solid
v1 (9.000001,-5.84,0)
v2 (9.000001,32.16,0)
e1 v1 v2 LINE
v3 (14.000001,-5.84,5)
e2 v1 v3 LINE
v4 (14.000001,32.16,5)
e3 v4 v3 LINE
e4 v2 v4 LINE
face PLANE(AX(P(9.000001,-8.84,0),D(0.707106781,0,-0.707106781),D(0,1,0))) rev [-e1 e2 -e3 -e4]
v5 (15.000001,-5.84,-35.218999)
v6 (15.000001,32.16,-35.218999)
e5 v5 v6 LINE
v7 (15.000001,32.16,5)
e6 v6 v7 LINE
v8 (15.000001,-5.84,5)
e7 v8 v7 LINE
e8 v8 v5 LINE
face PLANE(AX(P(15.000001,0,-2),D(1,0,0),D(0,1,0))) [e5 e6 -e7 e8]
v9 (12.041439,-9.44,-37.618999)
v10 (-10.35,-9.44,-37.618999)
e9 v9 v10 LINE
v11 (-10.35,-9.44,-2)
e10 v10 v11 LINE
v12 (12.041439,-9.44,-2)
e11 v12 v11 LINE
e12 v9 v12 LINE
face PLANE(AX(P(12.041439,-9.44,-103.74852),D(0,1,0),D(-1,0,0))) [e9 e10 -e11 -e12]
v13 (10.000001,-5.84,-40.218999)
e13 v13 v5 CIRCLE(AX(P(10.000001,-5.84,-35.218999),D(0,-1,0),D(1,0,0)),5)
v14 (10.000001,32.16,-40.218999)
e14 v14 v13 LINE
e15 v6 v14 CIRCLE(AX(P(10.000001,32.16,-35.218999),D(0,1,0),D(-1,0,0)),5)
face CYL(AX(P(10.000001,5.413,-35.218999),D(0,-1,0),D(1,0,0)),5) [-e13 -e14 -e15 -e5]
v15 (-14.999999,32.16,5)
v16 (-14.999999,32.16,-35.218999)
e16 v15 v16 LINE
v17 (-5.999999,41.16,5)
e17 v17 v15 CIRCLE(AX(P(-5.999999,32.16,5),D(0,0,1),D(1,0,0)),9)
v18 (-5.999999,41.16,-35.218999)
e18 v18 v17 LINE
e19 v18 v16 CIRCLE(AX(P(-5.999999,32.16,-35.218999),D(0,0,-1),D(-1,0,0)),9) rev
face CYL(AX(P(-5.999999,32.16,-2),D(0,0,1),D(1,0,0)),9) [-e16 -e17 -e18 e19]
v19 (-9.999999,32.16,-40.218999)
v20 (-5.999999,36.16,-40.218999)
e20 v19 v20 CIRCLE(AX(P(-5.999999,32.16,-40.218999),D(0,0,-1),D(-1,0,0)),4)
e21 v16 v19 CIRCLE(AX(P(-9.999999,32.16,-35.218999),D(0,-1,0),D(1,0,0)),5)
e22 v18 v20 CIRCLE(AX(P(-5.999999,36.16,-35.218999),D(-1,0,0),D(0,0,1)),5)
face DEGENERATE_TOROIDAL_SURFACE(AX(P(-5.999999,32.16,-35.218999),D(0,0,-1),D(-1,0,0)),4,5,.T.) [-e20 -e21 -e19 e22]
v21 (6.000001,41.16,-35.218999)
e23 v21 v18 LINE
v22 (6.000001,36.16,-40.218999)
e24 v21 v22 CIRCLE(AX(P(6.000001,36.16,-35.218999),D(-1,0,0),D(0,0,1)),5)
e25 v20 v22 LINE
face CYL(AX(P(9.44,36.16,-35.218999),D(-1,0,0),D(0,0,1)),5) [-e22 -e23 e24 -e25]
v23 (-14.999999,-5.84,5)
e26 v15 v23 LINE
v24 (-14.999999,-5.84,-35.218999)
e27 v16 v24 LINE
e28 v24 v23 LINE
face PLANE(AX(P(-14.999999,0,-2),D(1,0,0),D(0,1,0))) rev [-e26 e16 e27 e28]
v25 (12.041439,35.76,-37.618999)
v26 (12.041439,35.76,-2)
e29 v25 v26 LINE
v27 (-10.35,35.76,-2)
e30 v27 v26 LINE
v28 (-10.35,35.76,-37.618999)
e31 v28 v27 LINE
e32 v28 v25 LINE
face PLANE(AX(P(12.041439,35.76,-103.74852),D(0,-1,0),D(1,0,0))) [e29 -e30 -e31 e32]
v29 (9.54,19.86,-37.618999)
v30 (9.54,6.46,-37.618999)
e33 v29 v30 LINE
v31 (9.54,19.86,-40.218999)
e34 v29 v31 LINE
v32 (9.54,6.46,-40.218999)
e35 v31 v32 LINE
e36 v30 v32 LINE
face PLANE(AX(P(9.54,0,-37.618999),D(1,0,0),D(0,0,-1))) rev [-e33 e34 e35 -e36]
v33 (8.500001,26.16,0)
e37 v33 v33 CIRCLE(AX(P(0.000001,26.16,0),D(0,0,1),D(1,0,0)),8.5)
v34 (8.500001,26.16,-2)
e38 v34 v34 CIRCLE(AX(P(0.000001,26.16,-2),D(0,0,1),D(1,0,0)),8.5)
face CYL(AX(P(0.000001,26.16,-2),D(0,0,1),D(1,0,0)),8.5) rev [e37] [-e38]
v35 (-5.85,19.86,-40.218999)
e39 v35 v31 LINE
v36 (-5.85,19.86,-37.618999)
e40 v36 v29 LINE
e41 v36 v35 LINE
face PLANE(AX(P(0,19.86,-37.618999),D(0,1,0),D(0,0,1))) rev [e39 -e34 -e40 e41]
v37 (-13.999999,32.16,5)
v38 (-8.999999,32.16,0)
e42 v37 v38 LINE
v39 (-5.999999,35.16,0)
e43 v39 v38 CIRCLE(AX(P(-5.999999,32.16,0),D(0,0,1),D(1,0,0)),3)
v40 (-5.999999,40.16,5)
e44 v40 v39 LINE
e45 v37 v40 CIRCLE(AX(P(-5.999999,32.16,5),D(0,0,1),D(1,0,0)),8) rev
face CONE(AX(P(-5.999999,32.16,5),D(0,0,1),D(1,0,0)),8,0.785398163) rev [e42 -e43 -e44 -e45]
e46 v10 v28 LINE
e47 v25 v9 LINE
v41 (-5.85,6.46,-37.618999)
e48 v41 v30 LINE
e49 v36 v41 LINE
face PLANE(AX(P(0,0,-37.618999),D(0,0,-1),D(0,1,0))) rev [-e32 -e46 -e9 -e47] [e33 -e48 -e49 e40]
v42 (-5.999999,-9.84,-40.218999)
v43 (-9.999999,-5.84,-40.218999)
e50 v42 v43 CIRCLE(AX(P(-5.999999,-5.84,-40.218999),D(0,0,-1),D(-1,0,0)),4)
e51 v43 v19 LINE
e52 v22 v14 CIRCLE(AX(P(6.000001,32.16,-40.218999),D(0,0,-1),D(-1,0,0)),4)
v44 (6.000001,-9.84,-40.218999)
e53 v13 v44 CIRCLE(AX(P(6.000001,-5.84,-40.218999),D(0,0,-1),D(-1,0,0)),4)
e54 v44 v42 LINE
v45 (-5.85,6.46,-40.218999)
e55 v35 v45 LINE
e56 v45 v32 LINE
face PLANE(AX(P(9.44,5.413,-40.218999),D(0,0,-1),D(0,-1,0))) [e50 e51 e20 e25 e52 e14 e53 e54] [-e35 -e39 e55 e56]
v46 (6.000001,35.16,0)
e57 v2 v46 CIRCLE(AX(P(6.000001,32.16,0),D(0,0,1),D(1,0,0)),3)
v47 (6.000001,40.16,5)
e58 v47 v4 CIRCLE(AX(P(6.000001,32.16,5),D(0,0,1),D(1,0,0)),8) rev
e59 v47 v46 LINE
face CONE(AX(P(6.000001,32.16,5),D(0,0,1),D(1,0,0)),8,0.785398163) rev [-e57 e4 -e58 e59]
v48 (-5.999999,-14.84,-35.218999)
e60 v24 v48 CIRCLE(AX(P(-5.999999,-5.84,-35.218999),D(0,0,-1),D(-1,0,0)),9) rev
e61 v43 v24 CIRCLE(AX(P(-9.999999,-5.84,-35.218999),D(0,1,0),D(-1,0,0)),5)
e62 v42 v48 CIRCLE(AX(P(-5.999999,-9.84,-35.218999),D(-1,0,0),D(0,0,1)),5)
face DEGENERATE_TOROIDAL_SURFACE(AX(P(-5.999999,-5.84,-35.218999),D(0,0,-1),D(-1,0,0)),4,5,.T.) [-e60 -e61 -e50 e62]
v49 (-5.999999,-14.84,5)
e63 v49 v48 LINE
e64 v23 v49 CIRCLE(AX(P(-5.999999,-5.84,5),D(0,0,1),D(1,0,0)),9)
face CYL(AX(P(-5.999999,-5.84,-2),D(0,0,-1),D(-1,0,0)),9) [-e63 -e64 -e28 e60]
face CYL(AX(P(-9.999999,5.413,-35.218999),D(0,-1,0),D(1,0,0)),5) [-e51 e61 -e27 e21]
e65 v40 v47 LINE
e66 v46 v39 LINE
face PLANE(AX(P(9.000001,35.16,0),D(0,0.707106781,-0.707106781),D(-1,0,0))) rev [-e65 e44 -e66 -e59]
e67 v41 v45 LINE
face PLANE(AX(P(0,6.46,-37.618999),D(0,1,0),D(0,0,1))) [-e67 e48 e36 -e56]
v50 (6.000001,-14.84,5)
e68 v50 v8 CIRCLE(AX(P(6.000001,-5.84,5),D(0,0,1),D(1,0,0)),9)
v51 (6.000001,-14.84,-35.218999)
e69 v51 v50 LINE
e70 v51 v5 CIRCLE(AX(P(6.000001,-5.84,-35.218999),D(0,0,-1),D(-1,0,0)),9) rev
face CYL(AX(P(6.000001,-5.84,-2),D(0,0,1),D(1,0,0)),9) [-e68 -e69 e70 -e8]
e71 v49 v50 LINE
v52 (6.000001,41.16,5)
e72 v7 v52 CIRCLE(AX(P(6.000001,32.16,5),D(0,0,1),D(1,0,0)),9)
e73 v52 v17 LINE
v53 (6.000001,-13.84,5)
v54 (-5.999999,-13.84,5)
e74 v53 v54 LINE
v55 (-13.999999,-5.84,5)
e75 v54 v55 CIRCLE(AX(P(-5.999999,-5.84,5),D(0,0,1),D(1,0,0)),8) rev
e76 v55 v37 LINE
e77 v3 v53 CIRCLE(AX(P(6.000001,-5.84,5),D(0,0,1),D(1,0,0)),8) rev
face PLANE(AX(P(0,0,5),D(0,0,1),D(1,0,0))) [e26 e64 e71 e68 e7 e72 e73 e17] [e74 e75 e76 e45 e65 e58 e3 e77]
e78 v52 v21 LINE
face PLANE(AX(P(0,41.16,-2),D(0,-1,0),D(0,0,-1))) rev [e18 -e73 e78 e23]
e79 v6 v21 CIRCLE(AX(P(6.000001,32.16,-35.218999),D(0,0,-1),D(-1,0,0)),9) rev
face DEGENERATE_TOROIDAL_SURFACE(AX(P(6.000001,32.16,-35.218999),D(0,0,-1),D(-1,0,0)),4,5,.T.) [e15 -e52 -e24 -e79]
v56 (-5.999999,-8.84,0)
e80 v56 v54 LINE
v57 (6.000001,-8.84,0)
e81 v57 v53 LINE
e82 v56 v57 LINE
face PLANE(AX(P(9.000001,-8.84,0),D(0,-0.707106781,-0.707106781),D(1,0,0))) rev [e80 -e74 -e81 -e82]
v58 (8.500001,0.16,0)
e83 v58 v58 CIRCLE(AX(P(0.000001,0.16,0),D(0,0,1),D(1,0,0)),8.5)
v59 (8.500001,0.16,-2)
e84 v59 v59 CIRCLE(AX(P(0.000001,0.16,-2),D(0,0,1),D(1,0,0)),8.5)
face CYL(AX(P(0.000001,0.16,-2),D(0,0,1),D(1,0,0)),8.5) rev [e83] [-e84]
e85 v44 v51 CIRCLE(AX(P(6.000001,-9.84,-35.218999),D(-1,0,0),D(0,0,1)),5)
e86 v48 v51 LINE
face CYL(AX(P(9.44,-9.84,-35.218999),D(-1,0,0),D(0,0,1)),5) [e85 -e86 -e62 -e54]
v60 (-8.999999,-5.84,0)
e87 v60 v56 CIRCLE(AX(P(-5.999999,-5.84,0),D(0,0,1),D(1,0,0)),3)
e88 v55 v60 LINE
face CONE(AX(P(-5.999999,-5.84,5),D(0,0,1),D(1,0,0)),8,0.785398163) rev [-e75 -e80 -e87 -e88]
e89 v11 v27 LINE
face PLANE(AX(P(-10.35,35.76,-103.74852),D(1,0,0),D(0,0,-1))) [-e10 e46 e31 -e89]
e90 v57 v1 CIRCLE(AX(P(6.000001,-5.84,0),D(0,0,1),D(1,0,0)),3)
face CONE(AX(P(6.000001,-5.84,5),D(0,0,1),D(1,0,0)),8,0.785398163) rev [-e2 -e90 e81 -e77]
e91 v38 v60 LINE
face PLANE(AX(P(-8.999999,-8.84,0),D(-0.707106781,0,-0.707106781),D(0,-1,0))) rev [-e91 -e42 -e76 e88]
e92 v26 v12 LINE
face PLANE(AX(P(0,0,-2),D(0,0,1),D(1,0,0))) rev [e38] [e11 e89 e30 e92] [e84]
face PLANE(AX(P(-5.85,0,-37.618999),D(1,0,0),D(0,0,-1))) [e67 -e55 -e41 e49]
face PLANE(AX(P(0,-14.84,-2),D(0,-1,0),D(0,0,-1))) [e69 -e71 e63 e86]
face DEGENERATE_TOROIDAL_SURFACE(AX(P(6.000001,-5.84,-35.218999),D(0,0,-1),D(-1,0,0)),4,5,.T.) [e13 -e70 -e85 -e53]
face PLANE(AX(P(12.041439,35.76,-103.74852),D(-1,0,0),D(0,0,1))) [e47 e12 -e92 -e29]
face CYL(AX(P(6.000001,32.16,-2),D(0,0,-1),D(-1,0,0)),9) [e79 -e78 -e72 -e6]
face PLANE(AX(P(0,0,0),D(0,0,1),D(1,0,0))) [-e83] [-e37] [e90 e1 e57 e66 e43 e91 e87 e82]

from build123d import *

# Parameters (mm, degrees)
SKETCH1_W           = 30
SKETCH1_H           = 56
SKETCH1_W_2         = 18
SKETCH1_H_2         = 51
SKETCH1_R           = 8.5
BOSS_EXTRUDE1_DEPTH = 2
SKETCH2_W           = 30
SKETCH2_H           = 56
SKETCH2_W_2         = 18
SKETCH2_H_2         = 44
BOSS_EXTRUDE2_DEPTH = 5
FILLET1_R           = 9
FILLET3_R           = 3
CHAMFER3_SIZE       = 5
SKETCH4_W           = 22.39143934
SKETCH4_H           = 45.199999578
BOSS_EXTRUDE3_DEPTH = 38.218999496
SKETCH5_W           = 15.39
SKETCH5_H           = 13.400000422
BOSS_EXTRUDE4_DEPTH = 2.6
FILLET4_R           = 5


with BuildPart() as part:
    # Sketch1 → Boss-Extrude1 (new body)
    # profile 1 of 2: a face of its own
    with BuildSketch(Plane.XY):
        with Locations((1.276e-06, 13.160000211)):
            Rectangle(SKETCH1_W, SKETCH1_H)
        with Locations((1.276e-06, 13.160000211)):
            Rectangle(SKETCH1_W_2, SKETCH1_H_2, mode=Mode.SUBTRACT)
    # profile 2 of 2: a face of its own
    with BuildSketch(Plane.XY):
        with Locations((1.276e-06, 13.160000211)):
            Rectangle(SKETCH1_W_2, SKETCH1_H_2)
        with Locations((1.276e-06, 26.160000211)):
            Circle(SKETCH1_R, mode=Mode.SUBTRACT)
        with Locations((1.276e-06, 0.160000211)):
            Circle(SKETCH1_R, mode=Mode.SUBTRACT)
    extrude(amount=-BOSS_EXTRUDE1_DEPTH)

    # Sketch2 → Boss-Extrude2 (add)
    with BuildSketch(Plane.XY):
        with Locations((1.276e-06, 13.160000211)):
            Rectangle(SKETCH2_W, SKETCH2_H)
        with Locations((1.276e-06, 13.160000211)):
            Rectangle(SKETCH2_W_2, SKETCH2_H_2, mode=Mode.SUBTRACT)
    extrude(amount=BOSS_EXTRUDE2_DEPTH)

    # Fillet1
    fillet1_edges = [part.edges().sort_by_distance(p)[0] for p in [
        (-14.999998724, -14.839999789, 1.5),
        (-14.999998724, 41.160000211, 1.5),
        (15.000001276, 41.160000211, 1.5),
        (15.000001276, -14.839999789, 1.5),
    ]]
    fillet(fillet1_edges, radius=FILLET1_R)

    # Fillet3
    fillet3_edges = [part.edges().sort_by_distance(p)[0] for p in [
        (-8.999998724, -8.839999789, 2.5),
        (9.000001276, -8.839999789, 2.5),
        (9.000001276, 35.160000211, 2.5),
        (-8.999998724, 35.160000211, 2.5),
    ]]
    fillet(fillet3_edges, radius=FILLET3_R)

    # Chamfer3
    chamfer3_edges = [part.edges().sort_by_distance(p)[0] for p in [
        (9.000001276, 13.160000211, 5),
        (8.121321619, 34.281320554, 5),
        (8.121321619, -7.961320133, 5),
        (-8.121319068, 34.281320554, 5),
        (-8.121319068, -7.961320133, 5),
        (-8.999998724, 13.160000211, 5),
        (1.276e-06, 35.160000211, 5),
        (1.276e-06, -8.839999789, 5),
    ]]
    chamfer(chamfer3_edges, length=CHAMFER3_SIZE - 0.0001)  # a hair under: the kernel refuses the full size

    # Sketch4 → Boss-Extrude3 (add)
    with BuildSketch(Plane(origin=(0, 0, -2), x_dir=(-1, 0, 0), z_dir=(0, 0, -1))):
        with BuildLine():
            Line((5.999998724, 41.160000211), (-6.000001276, 41.160000211))
            ThreePointArc((-6.000001276, 41.160000211), (-12.363962306, 38.523961242), (-15.000001276, 32.160000211))
            Line((-15.000001276, 32.160000211), (-15.000001276, -5.839999789))
            ThreePointArc((-15.000001276, -5.839999789), (-12.363962306, -12.20396082), (-6.000001276, -14.839999789))
            Line((-6.000001276, -14.839999789), (5.999998724, -14.839999789))
            ThreePointArc((5.999998724, -14.839999789), (12.363959755, -12.20396082), (14.999998724, -5.839999789))
            Line((14.999998724, -5.839999789), (14.999998724, 32.160000211))
            ThreePointArc((14.999998724, 32.160000211), (12.363959755, 38.523961242), (5.999998724, 41.160000211))
        make_face()
        with Locations((-0.84571967, 13.160000211)):
            Rectangle(SKETCH4_W, SKETCH4_H, mode=Mode.SUBTRACT)
    extrude(amount=BOSS_EXTRUDE3_DEPTH)

    # Sketch5 → Boss-Extrude4 (add)
    with BuildSketch(Plane(origin=(0, 0, -40.218999496), x_dir=(-1, 0, 0), z_dir=(0, 0, -1))):
        with BuildLine():
            Line((14.999998724, -5.839999789), (14.999998724, 32.160000211))
            ThreePointArc((14.999998724, 32.160000211), (12.363959755, 38.523961242), (5.999998724, 41.160000211))
            Line((5.999998724, 41.160000211), (-6.000001276, 41.160000211))
            ThreePointArc((-6.000001276, 41.160000211), (-12.363962306, 38.523961242), (-15.000001276, 32.160000211))
            Line((-15.000001276, 32.160000211), (-15.000001276, -5.839999789))
            ThreePointArc((-15.000001276, -5.839999789), (-12.363962306, -12.20396082), (-6.000001276, -14.839999789))
            Line((-6.000001276, -14.839999789), (5.999998724, -14.839999789))
            ThreePointArc((5.999998724, -14.839999789), (12.363959755, -12.20396082), (14.999998724, -5.839999789))
        make_face()
        with Locations((-1.845, 13.160000211)):
            Rectangle(SKETCH5_W, SKETCH5_H, mode=Mode.SUBTRACT)
    extrude(amount=-BOSS_EXTRUDE4_DEPTH)

    # Fillet4
    fillet4_edges = [part.edges().sort_by_distance(p)[0] for p in [
        (-14.999998724, 13.160000211, -40.218999496),
        (-12.363959755, 38.523961242, -40.218999496),
        (1.276e-06, 41.160000211, -40.218999496),
        (12.363962306, 38.523961242, -40.218999496),
        (15.000001276, 13.160000211, -40.218999496),
        (12.363962306, -12.20396082, -40.218999496),
        (1.276e-06, -14.839999789, -40.218999496),
        (-12.363959755, -12.20396082, -40.218999496),
    ]]
    fillet(fillet4_edges, radius=FILLET4_R)


solid = part.part
